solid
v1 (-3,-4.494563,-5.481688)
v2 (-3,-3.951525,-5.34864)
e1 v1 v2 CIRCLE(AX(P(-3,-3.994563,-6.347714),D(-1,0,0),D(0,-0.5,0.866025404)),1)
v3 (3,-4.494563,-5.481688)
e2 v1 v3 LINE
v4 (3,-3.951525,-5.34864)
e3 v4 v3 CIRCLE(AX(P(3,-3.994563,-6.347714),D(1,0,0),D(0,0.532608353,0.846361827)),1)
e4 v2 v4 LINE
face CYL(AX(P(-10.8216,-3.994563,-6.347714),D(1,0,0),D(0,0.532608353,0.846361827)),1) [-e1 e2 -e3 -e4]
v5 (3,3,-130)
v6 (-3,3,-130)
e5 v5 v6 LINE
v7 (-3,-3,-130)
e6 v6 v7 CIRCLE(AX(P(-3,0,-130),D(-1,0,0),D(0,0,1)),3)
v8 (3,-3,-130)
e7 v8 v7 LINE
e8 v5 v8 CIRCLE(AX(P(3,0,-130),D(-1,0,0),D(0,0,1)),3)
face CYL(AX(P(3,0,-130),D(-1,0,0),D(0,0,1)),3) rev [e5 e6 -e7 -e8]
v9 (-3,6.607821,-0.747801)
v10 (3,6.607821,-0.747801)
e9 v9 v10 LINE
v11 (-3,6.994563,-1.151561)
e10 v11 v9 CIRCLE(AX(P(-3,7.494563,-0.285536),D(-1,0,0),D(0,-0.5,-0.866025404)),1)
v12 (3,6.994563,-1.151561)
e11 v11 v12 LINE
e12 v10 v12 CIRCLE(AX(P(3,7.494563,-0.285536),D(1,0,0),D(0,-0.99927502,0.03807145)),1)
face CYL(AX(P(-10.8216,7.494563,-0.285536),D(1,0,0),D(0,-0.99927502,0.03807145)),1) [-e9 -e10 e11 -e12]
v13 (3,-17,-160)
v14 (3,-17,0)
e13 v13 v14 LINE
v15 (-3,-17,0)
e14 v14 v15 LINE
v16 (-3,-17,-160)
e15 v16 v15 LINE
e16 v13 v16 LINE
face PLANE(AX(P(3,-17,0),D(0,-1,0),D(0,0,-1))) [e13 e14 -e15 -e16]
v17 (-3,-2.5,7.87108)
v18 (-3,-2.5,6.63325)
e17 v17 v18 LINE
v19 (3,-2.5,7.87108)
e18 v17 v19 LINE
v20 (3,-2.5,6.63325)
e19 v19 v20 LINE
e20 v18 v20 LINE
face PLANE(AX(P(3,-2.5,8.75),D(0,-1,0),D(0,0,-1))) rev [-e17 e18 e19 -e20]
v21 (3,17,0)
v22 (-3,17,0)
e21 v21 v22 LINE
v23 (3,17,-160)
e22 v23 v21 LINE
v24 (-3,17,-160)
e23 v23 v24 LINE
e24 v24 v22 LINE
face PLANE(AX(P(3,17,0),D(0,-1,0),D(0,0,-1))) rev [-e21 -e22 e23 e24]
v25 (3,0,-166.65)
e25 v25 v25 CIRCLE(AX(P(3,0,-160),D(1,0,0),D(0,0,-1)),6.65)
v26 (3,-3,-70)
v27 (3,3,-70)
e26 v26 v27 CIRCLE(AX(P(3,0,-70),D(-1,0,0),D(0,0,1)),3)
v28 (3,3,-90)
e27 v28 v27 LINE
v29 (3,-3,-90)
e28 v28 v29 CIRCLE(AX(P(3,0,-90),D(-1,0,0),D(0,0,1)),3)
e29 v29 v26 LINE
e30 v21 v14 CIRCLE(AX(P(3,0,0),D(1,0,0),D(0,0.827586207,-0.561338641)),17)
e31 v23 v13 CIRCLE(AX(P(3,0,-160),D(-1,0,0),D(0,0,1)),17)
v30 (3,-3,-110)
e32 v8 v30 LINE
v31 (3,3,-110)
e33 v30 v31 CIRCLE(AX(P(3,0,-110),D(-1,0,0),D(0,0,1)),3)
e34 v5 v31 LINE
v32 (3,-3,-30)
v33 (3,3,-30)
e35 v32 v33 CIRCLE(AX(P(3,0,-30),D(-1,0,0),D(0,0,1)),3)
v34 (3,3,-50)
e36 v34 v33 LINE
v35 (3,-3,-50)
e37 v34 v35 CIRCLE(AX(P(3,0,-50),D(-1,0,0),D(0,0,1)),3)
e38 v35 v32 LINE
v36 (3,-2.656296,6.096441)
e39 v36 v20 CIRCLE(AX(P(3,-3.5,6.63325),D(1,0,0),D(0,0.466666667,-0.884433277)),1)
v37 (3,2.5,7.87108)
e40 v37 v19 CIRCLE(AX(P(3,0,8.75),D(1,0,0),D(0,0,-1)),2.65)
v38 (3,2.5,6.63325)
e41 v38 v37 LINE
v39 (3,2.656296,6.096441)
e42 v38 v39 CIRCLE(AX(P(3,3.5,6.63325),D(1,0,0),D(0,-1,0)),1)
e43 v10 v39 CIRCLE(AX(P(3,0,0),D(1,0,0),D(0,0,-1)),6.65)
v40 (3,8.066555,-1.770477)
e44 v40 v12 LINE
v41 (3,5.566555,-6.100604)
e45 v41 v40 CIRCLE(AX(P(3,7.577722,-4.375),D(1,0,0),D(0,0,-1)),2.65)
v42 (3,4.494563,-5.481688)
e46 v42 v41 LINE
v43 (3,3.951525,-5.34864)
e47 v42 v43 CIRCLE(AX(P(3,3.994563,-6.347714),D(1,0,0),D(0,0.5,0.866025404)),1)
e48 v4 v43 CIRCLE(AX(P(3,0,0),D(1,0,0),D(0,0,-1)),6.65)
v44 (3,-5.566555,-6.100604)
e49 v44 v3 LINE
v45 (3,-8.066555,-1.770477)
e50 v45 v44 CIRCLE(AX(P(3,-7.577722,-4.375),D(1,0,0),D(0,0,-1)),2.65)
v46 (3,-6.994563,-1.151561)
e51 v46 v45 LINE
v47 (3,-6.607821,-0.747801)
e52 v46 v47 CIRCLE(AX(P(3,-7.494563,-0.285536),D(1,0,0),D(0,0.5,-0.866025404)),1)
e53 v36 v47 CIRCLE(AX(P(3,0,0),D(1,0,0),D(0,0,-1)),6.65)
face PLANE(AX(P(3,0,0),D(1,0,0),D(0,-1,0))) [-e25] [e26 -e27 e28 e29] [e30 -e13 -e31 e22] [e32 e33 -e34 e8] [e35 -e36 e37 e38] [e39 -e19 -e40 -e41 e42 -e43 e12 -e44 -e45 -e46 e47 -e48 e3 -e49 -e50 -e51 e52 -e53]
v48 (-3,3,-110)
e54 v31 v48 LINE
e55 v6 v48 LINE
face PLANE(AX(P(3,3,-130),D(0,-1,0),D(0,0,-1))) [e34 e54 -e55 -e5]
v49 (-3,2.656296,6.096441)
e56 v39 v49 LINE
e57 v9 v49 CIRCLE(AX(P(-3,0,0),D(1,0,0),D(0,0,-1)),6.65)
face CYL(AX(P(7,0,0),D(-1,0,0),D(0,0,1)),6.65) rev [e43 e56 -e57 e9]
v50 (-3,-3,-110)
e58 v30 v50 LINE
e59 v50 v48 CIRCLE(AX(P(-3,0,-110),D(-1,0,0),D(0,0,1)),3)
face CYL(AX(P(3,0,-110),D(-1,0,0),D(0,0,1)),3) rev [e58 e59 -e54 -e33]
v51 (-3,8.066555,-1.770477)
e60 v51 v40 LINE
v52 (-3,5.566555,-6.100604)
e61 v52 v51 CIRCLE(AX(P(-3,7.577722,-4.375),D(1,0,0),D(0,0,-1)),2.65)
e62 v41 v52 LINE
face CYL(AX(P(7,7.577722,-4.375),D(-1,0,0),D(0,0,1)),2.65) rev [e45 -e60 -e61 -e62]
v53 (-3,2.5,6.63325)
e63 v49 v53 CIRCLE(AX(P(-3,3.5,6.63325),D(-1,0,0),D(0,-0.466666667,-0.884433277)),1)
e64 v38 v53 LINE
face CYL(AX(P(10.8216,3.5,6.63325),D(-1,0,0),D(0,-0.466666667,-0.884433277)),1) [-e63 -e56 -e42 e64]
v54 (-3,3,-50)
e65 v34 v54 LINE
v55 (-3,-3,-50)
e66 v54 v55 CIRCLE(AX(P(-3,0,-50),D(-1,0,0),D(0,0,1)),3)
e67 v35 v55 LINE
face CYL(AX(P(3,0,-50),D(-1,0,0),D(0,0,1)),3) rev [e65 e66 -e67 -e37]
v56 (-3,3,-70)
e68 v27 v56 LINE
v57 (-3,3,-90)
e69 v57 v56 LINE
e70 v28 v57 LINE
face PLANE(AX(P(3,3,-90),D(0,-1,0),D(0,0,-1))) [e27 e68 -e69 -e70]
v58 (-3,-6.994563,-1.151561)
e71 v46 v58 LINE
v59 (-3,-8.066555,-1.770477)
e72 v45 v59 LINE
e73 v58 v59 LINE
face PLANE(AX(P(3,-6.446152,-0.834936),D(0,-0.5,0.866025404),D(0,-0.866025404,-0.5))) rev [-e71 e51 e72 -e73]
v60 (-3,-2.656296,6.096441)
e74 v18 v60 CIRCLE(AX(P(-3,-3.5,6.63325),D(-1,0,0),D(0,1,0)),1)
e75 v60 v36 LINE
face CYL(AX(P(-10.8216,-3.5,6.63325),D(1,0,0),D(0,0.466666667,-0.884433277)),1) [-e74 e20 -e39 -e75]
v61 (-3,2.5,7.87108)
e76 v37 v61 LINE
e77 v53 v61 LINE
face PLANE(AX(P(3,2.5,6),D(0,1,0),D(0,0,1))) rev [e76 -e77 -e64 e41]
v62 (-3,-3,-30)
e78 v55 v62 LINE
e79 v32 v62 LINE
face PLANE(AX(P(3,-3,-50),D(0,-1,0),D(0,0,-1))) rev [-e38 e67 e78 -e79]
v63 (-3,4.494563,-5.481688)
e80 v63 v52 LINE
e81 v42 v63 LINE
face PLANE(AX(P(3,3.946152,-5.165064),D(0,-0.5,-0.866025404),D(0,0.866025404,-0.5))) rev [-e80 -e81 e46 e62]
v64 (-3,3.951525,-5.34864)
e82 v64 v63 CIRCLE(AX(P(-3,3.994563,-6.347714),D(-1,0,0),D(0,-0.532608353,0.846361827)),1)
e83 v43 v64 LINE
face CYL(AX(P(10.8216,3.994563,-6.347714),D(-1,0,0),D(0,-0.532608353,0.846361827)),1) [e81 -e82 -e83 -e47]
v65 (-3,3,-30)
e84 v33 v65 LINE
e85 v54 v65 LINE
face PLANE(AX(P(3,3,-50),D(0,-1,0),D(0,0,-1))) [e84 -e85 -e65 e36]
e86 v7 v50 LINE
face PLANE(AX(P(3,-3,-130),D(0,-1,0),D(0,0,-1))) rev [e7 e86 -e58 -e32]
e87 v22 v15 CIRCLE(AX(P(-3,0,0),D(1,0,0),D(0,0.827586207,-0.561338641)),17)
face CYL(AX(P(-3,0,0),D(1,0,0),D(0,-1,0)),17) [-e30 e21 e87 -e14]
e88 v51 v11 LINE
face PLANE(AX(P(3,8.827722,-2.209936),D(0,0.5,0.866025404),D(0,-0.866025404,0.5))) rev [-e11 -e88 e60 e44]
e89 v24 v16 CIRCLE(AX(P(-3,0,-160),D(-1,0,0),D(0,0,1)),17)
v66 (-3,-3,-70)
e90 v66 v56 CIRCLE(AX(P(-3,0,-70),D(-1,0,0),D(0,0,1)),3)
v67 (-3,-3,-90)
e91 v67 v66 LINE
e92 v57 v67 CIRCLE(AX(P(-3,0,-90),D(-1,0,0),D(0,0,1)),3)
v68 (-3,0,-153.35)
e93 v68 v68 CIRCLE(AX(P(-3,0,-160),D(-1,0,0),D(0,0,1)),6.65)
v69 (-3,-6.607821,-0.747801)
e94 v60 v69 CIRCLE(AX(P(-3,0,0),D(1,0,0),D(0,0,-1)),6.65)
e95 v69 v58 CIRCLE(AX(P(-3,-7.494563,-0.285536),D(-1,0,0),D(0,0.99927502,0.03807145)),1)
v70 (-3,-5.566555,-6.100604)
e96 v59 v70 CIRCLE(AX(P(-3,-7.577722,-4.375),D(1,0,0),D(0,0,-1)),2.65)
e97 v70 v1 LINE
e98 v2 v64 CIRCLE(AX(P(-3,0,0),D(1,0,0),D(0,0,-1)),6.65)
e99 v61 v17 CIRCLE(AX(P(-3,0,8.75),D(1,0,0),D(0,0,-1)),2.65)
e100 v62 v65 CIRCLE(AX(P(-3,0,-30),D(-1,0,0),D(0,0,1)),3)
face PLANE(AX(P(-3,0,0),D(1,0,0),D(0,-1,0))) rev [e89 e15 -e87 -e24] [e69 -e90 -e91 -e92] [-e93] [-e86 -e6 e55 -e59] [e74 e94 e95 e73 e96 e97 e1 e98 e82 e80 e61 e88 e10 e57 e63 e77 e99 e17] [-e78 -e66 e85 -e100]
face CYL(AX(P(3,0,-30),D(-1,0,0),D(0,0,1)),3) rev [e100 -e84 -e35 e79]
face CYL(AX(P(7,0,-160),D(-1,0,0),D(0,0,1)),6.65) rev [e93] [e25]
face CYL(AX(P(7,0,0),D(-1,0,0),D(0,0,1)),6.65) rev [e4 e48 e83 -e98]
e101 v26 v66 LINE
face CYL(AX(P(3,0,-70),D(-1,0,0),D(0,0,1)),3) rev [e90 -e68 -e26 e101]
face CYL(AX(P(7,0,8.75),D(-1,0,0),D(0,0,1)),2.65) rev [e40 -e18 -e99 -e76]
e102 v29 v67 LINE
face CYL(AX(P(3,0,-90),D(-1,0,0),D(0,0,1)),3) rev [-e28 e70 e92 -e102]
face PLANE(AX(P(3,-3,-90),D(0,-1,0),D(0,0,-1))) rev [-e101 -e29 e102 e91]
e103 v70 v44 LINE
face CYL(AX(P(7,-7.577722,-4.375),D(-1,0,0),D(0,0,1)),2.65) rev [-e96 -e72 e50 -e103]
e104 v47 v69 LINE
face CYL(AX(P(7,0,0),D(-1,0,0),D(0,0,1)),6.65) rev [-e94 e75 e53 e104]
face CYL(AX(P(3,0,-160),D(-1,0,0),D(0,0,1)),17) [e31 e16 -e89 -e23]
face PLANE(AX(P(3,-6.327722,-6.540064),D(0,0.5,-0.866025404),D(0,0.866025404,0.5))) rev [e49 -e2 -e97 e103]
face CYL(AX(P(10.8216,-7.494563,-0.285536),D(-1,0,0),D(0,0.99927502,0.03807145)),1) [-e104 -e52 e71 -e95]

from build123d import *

# Parameters (mm, degrees)
CUT_EXTRUDE_START       = -6
CUT_EXTRUDE_4_OUTLINE_R = 6.5
CUT_EXTRUDE_4_DEPTH     = 6
SKETCH_1_6_R            = 6.65
CUT_EXTRUDE_5_DEPTH     = 10
SKETCH_1_7_W            = 120.462330866
SKETCH_1_7_H            = 12.505444566
EXTRUDE_1_DEPTH         = 6
CUT_EXTRUDE_6_DEPTH     = 6
EXTRUDE_START           = -6
SKETCH_3_R              = 6.65
EXTRUDE_3_DEPTH         = 6


with BuildPart() as part:
    # 切除-拉伸4: read off the stored shape, not the designer's step
    # 切除-拉伸4 outline → 切除-拉伸4 (new body)
    with BuildSketch(Plane.ZY.offset(3).offset(CUT_EXTRUDE_START)):
        with BuildLine():
            Line((-160, -12), (-16.278820596, -12))
            ThreePointArc((-16.278820596, -12), (-12.755499279, -12.528896875), (-9.542756901, -14.068965517))
            ThreePointArc((-9.542756901, -14.068965517), (17, 0), (-9.542756901, 14.068965517))
            ThreePointArc((-9.542756901, 14.068965517), (-12.755499279, 12.528896875), (-16.278820596, 12))
            Line((-16.278820596, 12), (-160, 12))
            ThreePointArc((-160, 12), (-172, 0), (-160, -12))
        make_face()
        with Locations((-160, 0)):
            Circle(CUT_EXTRUDE_4_OUTLINE_R, mode=Mode.SUBTRACT)
        with BuildLine():
            Line((-120, -3), (-134, -3))
            ThreePointArc((-134, -3), (-137, 0), (-134, 3))
            Line((-134, 3), (-120, 3))
            ThreePointArc((-120, 3), (-117, 0), (-120, -3))
        make_face(mode=Mode.SUBTRACT)
        with BuildLine():
            Line((-90, -3), (-104, -3))
            ThreePointArc((-104, -3), (-107, 0), (-104, 3))
            Line((-104, 3), (-90, 3))
            ThreePointArc((-90, 3), (-87, 0), (-90, -3))
        make_face(mode=Mode.SUBTRACT)
        with BuildLine():
            Line((-60, -3), (-74, -3))
            ThreePointArc((-74, -3), (-77, 0), (-74, 3))
            Line((-74, 3), (-60, 3))
            ThreePointArc((-60, 3), (-57, 0), (-60, -3))
        make_face(mode=Mode.SUBTRACT)
        with BuildLine():
            Line((-30, -3), (-44, -3))
            ThreePointArc((-44, -3), (-47, 0), (-44, 3))
            Line((-44, 3), (-30, 3))
            ThreePointArc((-30, 3), (-27, 0), (-30, -3))
        make_face(mode=Mode.SUBTRACT)
        with BuildLine():
            ThreePointArc((-5.4816883, -4.494562647), (-5.376440838, -4.232531174), (-5.348640266, -3.951524681))
            ThreePointArc((-5.348640266, -3.951524681), (-6.65, 0), (-5.348640266, 3.951524681))
            ThreePointArc((-5.348640266, 3.951524681), (-5.376440838, 4.232531174), (-5.4816883, 4.494562647))
            Line((-5.4816883, 4.494562647), (-6.100603614, 5.566555416))
            ThreePointArc((-6.100603614, 5.566555416), (-5.7, 9.872689603), (-1.770476595, 8.066555416))
            Line((-1.770476595, 8.066555416), (-1.151561281, 6.994562647))
            ThreePointArc((-1.151561281, 6.994562647), (-0.9772591, 6.772399934), (-0.747800624, 6.607820687))
            ThreePointArc((-0.747800624, 6.607820687), (3.325, 5.759068935), (6.09644089, 2.656296006))
            ThreePointArc((6.09644089, 2.656296006), (6.353699938, 2.53986876), (6.633249581, 2.5))
            Line((6.633249581, 2.5), (7.871080208, 2.5))
            ThreePointArc((7.871080208, 2.5), (11.4, 0), (7.871080208, -2.5))
            Line((7.871080208, -2.5), (6.633249581, -2.5))
            ThreePointArc((6.633249581, -2.5), (6.353699938, -2.53986876), (6.09644089, -2.656296006))
            ThreePointArc((6.09644089, -2.656296006), (3.325, -5.759068935), (-0.747800624, -6.607820687))
            ThreePointArc((-0.747800624, -6.607820687), (-0.9772591, -6.772399934), (-1.151561281, -6.994562647))
            Line((-1.151561281, -6.994562647), (-1.770476595, -8.066555416))
            ThreePointArc((-1.770476595, -8.066555416), (-5.7, -9.872689603), (-6.100603614, -5.566555416))
            Line((-6.100603614, -5.566555416), (-5.4816883, -4.494562647))
        make_face(mode=Mode.SUBTRACT)
    extrude(amount=CUT_EXTRUDE_4_DEPTH)

    # 草图1<6> → 切除-拉伸5 (cut)
    with BuildSketch(Plane.ZY.offset(3)):
        with Locations((-160, 0)):
            Circle(SKETCH_1_6_R)
    extrude(amount=-CUT_EXTRUDE_5_DEPTH, mode=Mode.SUBTRACT)

    # 草图1<7> → 凸台-拉伸1 (add)
    with BuildSketch(Plane.ZY.offset(3)):
        with Locations((-81.625615337, 0)):
            Rectangle(SKETCH_1_7_W, SKETCH_1_7_H)
    extrude(amount=-EXTRUDE_1_DEPTH)

    # 草图2 → 切除-拉伸6 (cut)
    with BuildSketch(Plane.ZY.offset(3)):
        with BuildLine():
            Line((-130, 3), (-110, 3))
            ThreePointArc((-110, 3), (-107, 0), (-110, -3))
            Line((-110, -3), (-130, -3))
            ThreePointArc((-130, -3), (-133, 0), (-130, 3))
        make_face()
        with BuildLine():
            Line((-90, 3), (-70, 3))
            ThreePointArc((-70, 3), (-67, 0), (-70, -3))
            Line((-70, -3), (-90, -3))
            ThreePointArc((-90, -3), (-93, 0), (-90, 3))
        make_face()
        with BuildLine():
            Line((-50, 3), (-30, 3))
            ThreePointArc((-30, 3), (-27, 0), (-30, -3))
            Line((-30, -3), (-50, -3))
            ThreePointArc((-50, -3), (-53, 0), (-50, 3))
        make_face()
    extrude(amount=-CUT_EXTRUDE_6_DEPTH, mode=Mode.SUBTRACT)

    # 草图3 → 凸台-拉伸3 (add)
    # profile 1 of 6: a face of its own
    with BuildSketch(Plane.ZY.offset(3).offset(EXTRUDE_START)):
        with BuildLine():
            Line((0, 17), (-160, 17))
            ThreePointArc((-160, 17), (-153.480797595, 15.700318468), (-147.958405421, 12))
            Line((-147.958405421, 12), (-16.278820596, 12))
            ThreePointArc((-16.278820596, 12), (-12.755499279, 12.528896875), (-9.542756901, 14.068965517))
            ThreePointArc((-9.542756901, 14.068965517), (-4.991371866, 16.250729427), (0, 17))
        make_face()
    # profile 2 of 6: a face of its own
    with BuildSketch(Plane.ZY.offset(3).offset(EXTRUDE_START)):
        with BuildLine():
            Line((-16.278820596, 12), (-147.958405421, 12))
            ThreePointArc((-147.958405421, 12), (-146.052319534, 9.719167126), (-144.57264474, 7.141198057))
            Line((-144.57264474, 7.141198057), (-15.42735526, 7.141198057))
            ThreePointArc((-15.42735526, 7.141198057), (-12.95666299, 11.005675089), (-9.542756901, 14.068965517))
            ThreePointArc((-9.542756901, 14.068965517), (-12.755499279, 12.528896875), (-16.278820596, 12))
        make_face()
    # profile 3 of 6: a face of its own
    with BuildSketch(Plane.ZY.offset(3).offset(EXTRUDE_START)):
        with BuildLine():
            ThreePointArc((-143.664552767, -4.706714744), (-145.350353999, -8.624840407), (-147.958405421, -12))
            Line((-147.958405421, -12), (-16.278820596, -12))
            ThreePointArc((-16.278820596, -12), (-12.755499279, -12.528896875), (-9.542756901, -14.068965517))
            ThreePointArc((-9.542756901, -14.068965517), (-13.759843647, -9.983321231), (-16.335447233, -4.706714744))
            Line((-16.335447233, -4.706714744), (-143.664552767, -4.706714744))
        make_face()
    # profile 4 of 6: a face of its own
    with BuildSketch(Plane.ZY.offset(3).offset(EXTRUDE_START)):
        with BuildLine():
            ThreePointArc((-147.958405421, -12), (-153.480797595, -15.700318468), (-160, -17))
            Line((-160, -17), (0, -17))
            ThreePointArc((0, -17), (-4.991371866, -16.250729427), (-9.542756901, -14.068965517))
            ThreePointArc((-9.542756901, -14.068965517), (-12.755499279, -12.528896875), (-16.278820596, -12))
            Line((-16.278820596, -12), (-147.958405421, -12))
        make_face()
    # profile 5 of 6: a face of its own
    with BuildSketch(Plane.ZY.offset(3).offset(EXTRUDE_START)):
        with BuildLine():
            ThreePointArc((-144.57264474, 7.141198057), (-146.052319534, 9.719167126), (-147.958405421, 12))
            Line((-147.958405421, 12), (-160, 12))
            ThreePointArc((-160, 12), (-172, 0), (-160, -12))
            Line((-160, -12), (-147.958405421, -12))
            ThreePointArc((-147.958405421, -12), (-145.350353999, -8.624840407), (-143.664552767, -4.706714744))
            ThreePointArc((-143.664552767, -4.706714744), (-143.166958044, -2.37669908), (-143, 0))
            ThreePointArc((-143, 0), (-143.397815815, 3.656156492), (-144.57264474, 7.141198057))
        make_face()
        with Locations((-160, 0)):
            Circle(SKETCH_3_R, mode=Mode.SUBTRACT)
    # profile 6 of 6: a face of its own
    with BuildSketch(Plane.ZY.offset(3).offset(EXTRUDE_START)):
        with BuildLine():
            ThreePointArc((-147.958405421, 12), (-153.480797595, 15.700318468), (-160, 17))
            ThreePointArc((-160, 17), (-177, 0), (-160, -17))
            ThreePointArc((-160, -17), (-153.480797595, -15.700318468), (-147.958405421, -12))
            Line((-147.958405421, -12), (-160, -12))
            ThreePointArc((-160, -12), (-172, 0), (-160, 12))
            Line((-160, 12), (-147.958405421, 12))
        make_face()
    extrude(amount=EXTRUDE_3_DEPTH)


solid = part.part
